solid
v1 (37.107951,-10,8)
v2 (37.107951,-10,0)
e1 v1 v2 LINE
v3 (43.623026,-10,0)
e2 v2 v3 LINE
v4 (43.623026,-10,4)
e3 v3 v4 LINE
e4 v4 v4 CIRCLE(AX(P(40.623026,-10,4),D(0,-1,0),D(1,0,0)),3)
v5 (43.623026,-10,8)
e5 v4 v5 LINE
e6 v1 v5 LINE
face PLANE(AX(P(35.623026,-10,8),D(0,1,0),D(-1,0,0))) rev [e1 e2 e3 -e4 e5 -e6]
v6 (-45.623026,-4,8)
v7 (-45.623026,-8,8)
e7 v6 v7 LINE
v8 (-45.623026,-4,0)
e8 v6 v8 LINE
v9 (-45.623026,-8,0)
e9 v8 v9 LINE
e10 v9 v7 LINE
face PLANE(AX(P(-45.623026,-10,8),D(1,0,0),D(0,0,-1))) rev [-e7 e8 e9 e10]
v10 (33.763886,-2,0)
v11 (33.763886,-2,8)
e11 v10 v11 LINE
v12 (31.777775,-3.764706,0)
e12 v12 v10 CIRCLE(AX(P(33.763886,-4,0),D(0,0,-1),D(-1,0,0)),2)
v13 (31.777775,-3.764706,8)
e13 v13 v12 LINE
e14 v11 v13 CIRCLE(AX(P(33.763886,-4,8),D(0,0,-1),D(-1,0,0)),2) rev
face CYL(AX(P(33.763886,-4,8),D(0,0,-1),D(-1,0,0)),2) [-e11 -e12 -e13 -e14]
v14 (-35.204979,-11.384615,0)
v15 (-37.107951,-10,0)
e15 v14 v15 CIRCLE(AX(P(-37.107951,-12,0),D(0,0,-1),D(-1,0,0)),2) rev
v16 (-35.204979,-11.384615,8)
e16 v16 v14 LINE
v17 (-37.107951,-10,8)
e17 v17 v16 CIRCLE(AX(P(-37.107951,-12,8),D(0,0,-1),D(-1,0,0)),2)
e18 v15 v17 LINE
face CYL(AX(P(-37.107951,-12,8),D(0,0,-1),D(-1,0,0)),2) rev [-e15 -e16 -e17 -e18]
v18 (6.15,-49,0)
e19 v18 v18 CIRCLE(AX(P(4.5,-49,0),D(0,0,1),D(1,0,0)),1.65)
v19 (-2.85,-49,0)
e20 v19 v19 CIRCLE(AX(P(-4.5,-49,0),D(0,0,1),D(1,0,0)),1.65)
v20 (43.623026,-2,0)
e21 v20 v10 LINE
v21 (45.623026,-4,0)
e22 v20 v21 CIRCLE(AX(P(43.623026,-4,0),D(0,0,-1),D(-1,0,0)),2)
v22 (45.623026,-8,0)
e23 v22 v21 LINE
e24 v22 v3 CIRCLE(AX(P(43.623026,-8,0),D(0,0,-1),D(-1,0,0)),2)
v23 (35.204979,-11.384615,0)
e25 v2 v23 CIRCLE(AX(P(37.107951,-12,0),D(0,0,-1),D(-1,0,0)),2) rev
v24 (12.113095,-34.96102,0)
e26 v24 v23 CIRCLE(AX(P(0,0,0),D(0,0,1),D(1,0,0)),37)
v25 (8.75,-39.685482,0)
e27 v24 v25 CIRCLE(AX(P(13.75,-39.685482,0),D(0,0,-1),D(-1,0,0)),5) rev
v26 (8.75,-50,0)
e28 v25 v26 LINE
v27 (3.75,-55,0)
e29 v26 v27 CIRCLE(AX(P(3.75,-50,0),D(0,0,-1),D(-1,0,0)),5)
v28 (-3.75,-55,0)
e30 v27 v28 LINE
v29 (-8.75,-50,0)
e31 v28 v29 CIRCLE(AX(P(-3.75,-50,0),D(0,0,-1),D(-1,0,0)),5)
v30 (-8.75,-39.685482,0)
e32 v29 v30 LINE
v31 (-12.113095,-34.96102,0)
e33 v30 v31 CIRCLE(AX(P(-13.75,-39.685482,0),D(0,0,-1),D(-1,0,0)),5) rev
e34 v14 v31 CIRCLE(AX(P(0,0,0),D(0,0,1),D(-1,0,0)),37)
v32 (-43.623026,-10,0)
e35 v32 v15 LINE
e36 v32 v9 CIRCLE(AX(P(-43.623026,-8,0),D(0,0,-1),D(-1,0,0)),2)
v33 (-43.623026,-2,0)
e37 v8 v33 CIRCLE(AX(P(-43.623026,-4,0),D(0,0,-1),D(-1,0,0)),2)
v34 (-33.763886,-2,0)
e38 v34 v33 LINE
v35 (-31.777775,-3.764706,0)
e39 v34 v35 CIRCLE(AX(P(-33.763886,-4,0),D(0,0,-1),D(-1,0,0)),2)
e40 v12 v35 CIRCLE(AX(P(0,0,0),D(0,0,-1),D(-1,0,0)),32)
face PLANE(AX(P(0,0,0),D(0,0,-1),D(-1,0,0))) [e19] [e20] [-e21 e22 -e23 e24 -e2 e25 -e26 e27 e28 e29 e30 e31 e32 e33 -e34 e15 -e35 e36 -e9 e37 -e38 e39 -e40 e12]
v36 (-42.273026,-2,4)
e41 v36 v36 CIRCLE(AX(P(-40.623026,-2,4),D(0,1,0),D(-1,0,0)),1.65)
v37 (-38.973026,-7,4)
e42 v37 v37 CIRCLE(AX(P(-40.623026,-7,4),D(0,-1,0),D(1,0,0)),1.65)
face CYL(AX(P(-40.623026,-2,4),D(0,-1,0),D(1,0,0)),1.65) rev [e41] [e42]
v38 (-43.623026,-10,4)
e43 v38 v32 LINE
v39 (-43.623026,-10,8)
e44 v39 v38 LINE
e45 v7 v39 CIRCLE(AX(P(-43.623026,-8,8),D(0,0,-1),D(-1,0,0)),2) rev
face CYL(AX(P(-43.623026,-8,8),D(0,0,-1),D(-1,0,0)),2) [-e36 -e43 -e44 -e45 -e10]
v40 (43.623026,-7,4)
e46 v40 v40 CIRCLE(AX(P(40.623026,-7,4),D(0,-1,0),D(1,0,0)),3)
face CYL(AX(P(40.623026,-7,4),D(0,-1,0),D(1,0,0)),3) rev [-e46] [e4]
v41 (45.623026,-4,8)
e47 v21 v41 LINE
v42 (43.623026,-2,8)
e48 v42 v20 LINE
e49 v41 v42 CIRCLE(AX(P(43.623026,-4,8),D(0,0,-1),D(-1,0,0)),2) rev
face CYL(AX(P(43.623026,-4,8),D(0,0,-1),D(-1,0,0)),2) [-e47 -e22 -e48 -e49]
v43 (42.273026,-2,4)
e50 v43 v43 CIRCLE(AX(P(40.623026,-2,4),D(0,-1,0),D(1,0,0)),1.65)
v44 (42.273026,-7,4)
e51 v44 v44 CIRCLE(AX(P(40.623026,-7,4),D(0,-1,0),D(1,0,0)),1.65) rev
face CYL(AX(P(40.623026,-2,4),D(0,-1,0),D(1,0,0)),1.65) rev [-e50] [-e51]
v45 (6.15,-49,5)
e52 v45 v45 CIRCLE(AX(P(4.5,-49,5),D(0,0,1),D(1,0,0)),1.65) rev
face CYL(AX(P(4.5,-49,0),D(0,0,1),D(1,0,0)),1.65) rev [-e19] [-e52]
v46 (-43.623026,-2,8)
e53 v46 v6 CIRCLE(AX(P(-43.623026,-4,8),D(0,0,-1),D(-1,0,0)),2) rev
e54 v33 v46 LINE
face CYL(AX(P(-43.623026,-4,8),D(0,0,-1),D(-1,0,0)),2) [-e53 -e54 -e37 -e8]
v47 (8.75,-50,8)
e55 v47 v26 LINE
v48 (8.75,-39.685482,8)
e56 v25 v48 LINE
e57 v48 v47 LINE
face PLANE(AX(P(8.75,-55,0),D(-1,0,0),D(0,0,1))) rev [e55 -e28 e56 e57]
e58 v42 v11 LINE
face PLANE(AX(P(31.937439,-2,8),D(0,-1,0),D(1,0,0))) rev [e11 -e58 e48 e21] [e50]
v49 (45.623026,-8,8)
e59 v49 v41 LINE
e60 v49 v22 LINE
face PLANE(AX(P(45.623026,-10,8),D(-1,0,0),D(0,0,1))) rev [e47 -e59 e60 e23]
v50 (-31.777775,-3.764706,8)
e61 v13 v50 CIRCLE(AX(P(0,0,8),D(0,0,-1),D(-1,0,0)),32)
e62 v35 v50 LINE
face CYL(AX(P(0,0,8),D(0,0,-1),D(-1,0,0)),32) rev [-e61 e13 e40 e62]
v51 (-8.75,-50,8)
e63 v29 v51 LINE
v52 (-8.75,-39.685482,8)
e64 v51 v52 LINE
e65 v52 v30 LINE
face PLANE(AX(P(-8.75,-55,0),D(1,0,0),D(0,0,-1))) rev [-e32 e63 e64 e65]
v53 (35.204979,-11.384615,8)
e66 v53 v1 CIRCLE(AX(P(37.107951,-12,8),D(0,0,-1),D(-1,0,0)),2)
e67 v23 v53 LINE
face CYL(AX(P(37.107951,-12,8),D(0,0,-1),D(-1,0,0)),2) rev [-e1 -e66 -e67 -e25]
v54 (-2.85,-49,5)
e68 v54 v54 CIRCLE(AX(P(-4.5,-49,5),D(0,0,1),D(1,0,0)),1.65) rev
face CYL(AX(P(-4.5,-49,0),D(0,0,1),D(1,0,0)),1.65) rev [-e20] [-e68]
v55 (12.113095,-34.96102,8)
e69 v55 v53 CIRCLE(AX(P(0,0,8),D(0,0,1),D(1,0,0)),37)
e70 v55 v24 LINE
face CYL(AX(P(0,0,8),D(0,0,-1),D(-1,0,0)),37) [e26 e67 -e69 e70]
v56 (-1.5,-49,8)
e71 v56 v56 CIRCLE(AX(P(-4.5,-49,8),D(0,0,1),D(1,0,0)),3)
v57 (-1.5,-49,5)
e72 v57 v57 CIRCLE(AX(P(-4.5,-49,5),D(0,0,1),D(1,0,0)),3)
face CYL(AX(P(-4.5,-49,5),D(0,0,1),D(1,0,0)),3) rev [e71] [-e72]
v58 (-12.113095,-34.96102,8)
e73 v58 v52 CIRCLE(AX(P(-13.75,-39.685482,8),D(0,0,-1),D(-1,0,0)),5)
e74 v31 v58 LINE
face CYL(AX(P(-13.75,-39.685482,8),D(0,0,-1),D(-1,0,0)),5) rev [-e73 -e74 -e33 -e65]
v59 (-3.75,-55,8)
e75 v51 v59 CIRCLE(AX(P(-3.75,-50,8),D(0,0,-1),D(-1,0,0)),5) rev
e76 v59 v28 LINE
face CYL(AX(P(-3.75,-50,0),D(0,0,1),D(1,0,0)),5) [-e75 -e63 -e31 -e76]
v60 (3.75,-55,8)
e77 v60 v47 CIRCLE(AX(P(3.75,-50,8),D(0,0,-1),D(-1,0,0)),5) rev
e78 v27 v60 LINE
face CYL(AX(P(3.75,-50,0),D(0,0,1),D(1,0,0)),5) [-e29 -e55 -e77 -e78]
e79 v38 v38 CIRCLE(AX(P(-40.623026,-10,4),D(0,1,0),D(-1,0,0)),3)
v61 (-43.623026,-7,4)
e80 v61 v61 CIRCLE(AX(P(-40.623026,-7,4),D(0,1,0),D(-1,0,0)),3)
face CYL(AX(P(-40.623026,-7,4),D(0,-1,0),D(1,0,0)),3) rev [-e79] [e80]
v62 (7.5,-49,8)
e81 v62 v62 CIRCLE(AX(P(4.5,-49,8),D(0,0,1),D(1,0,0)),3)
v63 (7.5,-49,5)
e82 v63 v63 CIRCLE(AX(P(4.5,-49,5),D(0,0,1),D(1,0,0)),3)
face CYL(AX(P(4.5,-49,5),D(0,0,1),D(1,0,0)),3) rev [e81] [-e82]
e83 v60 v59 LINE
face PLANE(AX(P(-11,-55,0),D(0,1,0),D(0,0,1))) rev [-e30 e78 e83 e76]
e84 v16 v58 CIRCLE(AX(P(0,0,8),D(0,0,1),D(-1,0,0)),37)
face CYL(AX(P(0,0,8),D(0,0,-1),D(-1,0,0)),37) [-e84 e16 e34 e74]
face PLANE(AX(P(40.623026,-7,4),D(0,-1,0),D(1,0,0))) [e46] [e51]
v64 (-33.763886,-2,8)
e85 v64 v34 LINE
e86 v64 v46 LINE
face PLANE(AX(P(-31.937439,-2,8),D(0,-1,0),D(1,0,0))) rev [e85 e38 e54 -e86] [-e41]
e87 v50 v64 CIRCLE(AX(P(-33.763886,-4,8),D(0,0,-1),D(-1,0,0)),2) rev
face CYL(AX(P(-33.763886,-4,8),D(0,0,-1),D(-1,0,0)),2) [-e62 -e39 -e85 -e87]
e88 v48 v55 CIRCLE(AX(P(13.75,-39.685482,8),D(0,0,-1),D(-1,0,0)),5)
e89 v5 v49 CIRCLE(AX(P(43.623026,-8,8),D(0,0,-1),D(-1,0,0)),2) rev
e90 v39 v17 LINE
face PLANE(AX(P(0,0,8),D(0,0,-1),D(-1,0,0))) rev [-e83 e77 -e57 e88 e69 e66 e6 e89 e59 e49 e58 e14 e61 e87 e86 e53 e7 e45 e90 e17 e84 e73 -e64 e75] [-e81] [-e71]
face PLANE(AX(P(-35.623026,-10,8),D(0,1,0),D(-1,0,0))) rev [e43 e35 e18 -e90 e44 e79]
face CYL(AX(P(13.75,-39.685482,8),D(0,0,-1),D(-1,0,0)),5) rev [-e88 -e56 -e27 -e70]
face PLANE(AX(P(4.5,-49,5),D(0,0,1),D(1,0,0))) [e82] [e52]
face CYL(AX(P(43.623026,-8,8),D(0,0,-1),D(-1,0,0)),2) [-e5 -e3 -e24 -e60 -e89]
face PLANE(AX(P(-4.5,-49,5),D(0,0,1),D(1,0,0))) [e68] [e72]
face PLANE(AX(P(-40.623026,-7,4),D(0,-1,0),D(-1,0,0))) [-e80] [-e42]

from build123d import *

# Parameters (mm, degrees)
SKETCH3_R           = 8.05
BOSS_EXTRUDE1_DEPTH = 8
SKETCH4_R           = 8.05
SKETCH4_R_2         = 4.3
BOSS_EXTRUDE2_DEPTH = 3
CHAMFER1_SIZE       = 3
FILLET1_R           = 11
SKETCH5_R           = 1.65
CUT_EXTRUDE1_DEPTH  = 85.020655349
SKETCH6_R           = 3
CUT_EXTRUDE2_DEPTH  = 3
SKETCH7_W           = 22
SKETCH7_H           = 25.1
CUT_EXTRUDE3_DEPTH  = 93.528214752
FILLET2_R           = 2
SKETCH8_R           = 1.65
CUT_EXTRUDE4_DEPTH  = 72.905914397
CUT_EXTRUDE5_DEPTH  = 72.905914397
FILLET3_R           = 5
SKETCH10_R          = 3
CUT_EXTRUDE6_DEPTH  = 3


with BuildPart() as part:
    # Sketch3 → Boss-Extrude1 (new body)
    with BuildSketch(Plane.XY):
        with BuildLine():
            Line((-31.937438845, -2), (-45.623026261, -2))
            Line((-45.623026261, -2), (-45.623026261, -10))
            Line((-45.623026261, -10), (-35.623026261, -10))
            ThreePointArc((-35.623026261, -10), (-26.529067588, -25.791637654), (-11, -35.327043465))
            Line((-11, -35.327043465), (-11, -80.1))
            Line((-11, -80.1), (11, -80.1))
            Line((11, -80.1), (11, -35.327043465))
            ThreePointArc((11, -35.327043465), (26.529067588, -25.791637654), (35.623026261, -10))
            Line((35.623026261, -10), (45.623026261, -10))
            Line((45.623026261, -10), (45.623026261, -2))
            Line((45.623026261, -2), (31.937438845, -2))
            ThreePointArc((31.937438845, -2), (0, -32), (-31.937438845, -2))
        make_face()
        with Locations((0, -69.1)):
            Circle(SKETCH3_R, mode=Mode.SUBTRACT)
    extrude(amount=BOSS_EXTRUDE1_DEPTH)

    # Sketch4 → Boss-Extrude2 (add)
    with BuildSketch(Plane.XY):
        with Locations(Location((0, -69.1, 0), (0, 0, 180))):
            Circle(SKETCH4_R)
        with Locations(Location((0, -69.1, 0), (0, 0, 180))):
            Circle(SKETCH4_R_2, mode=Mode.SUBTRACT)
    extrude(amount=BOSS_EXTRUDE2_DEPTH)

    # Chamfer1
    chamfer1_edges = [part.edges().sort_by_distance(p)[0] for p in [
        (0, -80.1, 0),
    ]]
    chamfer(chamfer1_edges, length=CHAMFER1_SIZE)

    # Fillet1
    fillet1_edges = [part.edges().sort_by_distance(p)[0] for p in [
        (-11, -80.1, 5.5),
        (11, -80.1, 5.5),
    ]]
    fillet(fillet1_edges, radius=FILLET1_R - 0.0001)  # a hair under: the kernel refuses the full size

    # Sketch5 → Cut-Extrude1 (cut, through all)
    with BuildSketch(Plane.XZ.offset(10)):
        with Locations((40.623026261, 4)):
            Circle(SKETCH5_R)
    cut_extrude1 = extrude(amount=-CUT_EXTRUDE1_DEPTH, mode=Mode.SUBTRACT)

    # Sketch6 → Cut-Extrude2 (cut)
    with BuildSketch(Plane.XZ.offset(10)):
        with Locations((40.623026261, 4)):
            Circle(SKETCH6_R)
    cut_extrude2 = extrude(amount=-CUT_EXTRUDE2_DEPTH, mode=Mode.SUBTRACT)

    # Mirror1: Cut-Extrude1, Cut-Extrude2 across plane
    add(cut_extrude1.mirror(Plane(origin=(0, 0, 0), x_dir=(0, 0, 1), z_dir=(1, 0, 0))), mode=Mode.SUBTRACT)
    add(cut_extrude2.mirror(Plane(origin=(0, 0, 0), x_dir=(0, 0, 1), z_dir=(1, 0, 0))), mode=Mode.SUBTRACT)

    # Sketch7 → Cut-Extrude3 (cut, through all)
    with BuildSketch(Plane.XY.offset(8)):
        with Locations((0, -67.55)):
            Rectangle(SKETCH7_W, SKETCH7_H)
    extrude(amount=-CUT_EXTRUDE3_DEPTH, mode=Mode.SUBTRACT)

    # Fillet2
    fillet2_edges = [part.edges().sort_by_distance(p)[0] for p in [
        (-45.623026261, -2, 4),
        (-31.937438845, -2, 4),
        (31.937438845, -2, 4),
        (45.623026261, -2, 4),
        (45.623026261, -10, 4),
        (35.623026261, -10, 4),
        (-35.623026261, -10, 4),
        (-45.623026261, -10, 4),
    ]]
    fillet(fillet2_edges, radius=FILLET2_R - 0.0001)  # a hair under: the kernel refuses the full size

    # Sketch8 → Cut-Extrude4 (cut, through all)
    with BuildSketch(Plane.XY.offset(8)):
        with Locations((4.5, -49)):
            Circle(SKETCH8_R)
        with Locations((-4.5, -49)):
            Circle(SKETCH8_R)
    extrude(amount=-CUT_EXTRUDE4_DEPTH, mode=Mode.SUBTRACT)

    # Sketch9 → Cut-Extrude5 (cut, through all)
    with BuildSketch(Plane.XY.offset(8)):
        with BuildLine():
            Line((-8.75, -55), (-8.75, -35.950486784))
            ThreePointArc((-8.75, -35.950486784), (-9.879918795, -35.656517001), (-11, -35.327043465))
            Line((-11, -35.327043465), (-11, -55))
            Line((-11, -55), (-8.75, -55))
        make_face()
        with BuildLine():
            Line((8.75, -55), (8.75, -35.950486784))
            ThreePointArc((8.75, -35.950486784), (9.879918795, -35.656517001), (11, -35.327043465))
            Line((11, -35.327043465), (11, -55))
            Line((11, -55), (8.75, -55))
        make_face()
    extrude(amount=-CUT_EXTRUDE5_DEPTH, mode=Mode.SUBTRACT)

    # Fillet3
    fillet3_edges = [part.edges().sort_by_distance(p)[0] for p in [
        (-8.75, -55, 4),
        (-8.75, -35.950486784, 4),
        (8.75, -55, 4),
        (8.75, -35.950486784, 4),
    ]]
    fillet(fillet3_edges, radius=FILLET3_R)

    # Sketch10 → Cut-Extrude6 (cut)
    with BuildSketch(Plane.XY.offset(8)):
        with Locations((4.5, -49)):
            Circle(SKETCH10_R)
        with Locations((-4.5, -49)):
            Circle(SKETCH10_R)
    extrude(amount=-CUT_EXTRUDE6_DEPTH, mode=Mode.SUBTRACT)


solid = part.part
